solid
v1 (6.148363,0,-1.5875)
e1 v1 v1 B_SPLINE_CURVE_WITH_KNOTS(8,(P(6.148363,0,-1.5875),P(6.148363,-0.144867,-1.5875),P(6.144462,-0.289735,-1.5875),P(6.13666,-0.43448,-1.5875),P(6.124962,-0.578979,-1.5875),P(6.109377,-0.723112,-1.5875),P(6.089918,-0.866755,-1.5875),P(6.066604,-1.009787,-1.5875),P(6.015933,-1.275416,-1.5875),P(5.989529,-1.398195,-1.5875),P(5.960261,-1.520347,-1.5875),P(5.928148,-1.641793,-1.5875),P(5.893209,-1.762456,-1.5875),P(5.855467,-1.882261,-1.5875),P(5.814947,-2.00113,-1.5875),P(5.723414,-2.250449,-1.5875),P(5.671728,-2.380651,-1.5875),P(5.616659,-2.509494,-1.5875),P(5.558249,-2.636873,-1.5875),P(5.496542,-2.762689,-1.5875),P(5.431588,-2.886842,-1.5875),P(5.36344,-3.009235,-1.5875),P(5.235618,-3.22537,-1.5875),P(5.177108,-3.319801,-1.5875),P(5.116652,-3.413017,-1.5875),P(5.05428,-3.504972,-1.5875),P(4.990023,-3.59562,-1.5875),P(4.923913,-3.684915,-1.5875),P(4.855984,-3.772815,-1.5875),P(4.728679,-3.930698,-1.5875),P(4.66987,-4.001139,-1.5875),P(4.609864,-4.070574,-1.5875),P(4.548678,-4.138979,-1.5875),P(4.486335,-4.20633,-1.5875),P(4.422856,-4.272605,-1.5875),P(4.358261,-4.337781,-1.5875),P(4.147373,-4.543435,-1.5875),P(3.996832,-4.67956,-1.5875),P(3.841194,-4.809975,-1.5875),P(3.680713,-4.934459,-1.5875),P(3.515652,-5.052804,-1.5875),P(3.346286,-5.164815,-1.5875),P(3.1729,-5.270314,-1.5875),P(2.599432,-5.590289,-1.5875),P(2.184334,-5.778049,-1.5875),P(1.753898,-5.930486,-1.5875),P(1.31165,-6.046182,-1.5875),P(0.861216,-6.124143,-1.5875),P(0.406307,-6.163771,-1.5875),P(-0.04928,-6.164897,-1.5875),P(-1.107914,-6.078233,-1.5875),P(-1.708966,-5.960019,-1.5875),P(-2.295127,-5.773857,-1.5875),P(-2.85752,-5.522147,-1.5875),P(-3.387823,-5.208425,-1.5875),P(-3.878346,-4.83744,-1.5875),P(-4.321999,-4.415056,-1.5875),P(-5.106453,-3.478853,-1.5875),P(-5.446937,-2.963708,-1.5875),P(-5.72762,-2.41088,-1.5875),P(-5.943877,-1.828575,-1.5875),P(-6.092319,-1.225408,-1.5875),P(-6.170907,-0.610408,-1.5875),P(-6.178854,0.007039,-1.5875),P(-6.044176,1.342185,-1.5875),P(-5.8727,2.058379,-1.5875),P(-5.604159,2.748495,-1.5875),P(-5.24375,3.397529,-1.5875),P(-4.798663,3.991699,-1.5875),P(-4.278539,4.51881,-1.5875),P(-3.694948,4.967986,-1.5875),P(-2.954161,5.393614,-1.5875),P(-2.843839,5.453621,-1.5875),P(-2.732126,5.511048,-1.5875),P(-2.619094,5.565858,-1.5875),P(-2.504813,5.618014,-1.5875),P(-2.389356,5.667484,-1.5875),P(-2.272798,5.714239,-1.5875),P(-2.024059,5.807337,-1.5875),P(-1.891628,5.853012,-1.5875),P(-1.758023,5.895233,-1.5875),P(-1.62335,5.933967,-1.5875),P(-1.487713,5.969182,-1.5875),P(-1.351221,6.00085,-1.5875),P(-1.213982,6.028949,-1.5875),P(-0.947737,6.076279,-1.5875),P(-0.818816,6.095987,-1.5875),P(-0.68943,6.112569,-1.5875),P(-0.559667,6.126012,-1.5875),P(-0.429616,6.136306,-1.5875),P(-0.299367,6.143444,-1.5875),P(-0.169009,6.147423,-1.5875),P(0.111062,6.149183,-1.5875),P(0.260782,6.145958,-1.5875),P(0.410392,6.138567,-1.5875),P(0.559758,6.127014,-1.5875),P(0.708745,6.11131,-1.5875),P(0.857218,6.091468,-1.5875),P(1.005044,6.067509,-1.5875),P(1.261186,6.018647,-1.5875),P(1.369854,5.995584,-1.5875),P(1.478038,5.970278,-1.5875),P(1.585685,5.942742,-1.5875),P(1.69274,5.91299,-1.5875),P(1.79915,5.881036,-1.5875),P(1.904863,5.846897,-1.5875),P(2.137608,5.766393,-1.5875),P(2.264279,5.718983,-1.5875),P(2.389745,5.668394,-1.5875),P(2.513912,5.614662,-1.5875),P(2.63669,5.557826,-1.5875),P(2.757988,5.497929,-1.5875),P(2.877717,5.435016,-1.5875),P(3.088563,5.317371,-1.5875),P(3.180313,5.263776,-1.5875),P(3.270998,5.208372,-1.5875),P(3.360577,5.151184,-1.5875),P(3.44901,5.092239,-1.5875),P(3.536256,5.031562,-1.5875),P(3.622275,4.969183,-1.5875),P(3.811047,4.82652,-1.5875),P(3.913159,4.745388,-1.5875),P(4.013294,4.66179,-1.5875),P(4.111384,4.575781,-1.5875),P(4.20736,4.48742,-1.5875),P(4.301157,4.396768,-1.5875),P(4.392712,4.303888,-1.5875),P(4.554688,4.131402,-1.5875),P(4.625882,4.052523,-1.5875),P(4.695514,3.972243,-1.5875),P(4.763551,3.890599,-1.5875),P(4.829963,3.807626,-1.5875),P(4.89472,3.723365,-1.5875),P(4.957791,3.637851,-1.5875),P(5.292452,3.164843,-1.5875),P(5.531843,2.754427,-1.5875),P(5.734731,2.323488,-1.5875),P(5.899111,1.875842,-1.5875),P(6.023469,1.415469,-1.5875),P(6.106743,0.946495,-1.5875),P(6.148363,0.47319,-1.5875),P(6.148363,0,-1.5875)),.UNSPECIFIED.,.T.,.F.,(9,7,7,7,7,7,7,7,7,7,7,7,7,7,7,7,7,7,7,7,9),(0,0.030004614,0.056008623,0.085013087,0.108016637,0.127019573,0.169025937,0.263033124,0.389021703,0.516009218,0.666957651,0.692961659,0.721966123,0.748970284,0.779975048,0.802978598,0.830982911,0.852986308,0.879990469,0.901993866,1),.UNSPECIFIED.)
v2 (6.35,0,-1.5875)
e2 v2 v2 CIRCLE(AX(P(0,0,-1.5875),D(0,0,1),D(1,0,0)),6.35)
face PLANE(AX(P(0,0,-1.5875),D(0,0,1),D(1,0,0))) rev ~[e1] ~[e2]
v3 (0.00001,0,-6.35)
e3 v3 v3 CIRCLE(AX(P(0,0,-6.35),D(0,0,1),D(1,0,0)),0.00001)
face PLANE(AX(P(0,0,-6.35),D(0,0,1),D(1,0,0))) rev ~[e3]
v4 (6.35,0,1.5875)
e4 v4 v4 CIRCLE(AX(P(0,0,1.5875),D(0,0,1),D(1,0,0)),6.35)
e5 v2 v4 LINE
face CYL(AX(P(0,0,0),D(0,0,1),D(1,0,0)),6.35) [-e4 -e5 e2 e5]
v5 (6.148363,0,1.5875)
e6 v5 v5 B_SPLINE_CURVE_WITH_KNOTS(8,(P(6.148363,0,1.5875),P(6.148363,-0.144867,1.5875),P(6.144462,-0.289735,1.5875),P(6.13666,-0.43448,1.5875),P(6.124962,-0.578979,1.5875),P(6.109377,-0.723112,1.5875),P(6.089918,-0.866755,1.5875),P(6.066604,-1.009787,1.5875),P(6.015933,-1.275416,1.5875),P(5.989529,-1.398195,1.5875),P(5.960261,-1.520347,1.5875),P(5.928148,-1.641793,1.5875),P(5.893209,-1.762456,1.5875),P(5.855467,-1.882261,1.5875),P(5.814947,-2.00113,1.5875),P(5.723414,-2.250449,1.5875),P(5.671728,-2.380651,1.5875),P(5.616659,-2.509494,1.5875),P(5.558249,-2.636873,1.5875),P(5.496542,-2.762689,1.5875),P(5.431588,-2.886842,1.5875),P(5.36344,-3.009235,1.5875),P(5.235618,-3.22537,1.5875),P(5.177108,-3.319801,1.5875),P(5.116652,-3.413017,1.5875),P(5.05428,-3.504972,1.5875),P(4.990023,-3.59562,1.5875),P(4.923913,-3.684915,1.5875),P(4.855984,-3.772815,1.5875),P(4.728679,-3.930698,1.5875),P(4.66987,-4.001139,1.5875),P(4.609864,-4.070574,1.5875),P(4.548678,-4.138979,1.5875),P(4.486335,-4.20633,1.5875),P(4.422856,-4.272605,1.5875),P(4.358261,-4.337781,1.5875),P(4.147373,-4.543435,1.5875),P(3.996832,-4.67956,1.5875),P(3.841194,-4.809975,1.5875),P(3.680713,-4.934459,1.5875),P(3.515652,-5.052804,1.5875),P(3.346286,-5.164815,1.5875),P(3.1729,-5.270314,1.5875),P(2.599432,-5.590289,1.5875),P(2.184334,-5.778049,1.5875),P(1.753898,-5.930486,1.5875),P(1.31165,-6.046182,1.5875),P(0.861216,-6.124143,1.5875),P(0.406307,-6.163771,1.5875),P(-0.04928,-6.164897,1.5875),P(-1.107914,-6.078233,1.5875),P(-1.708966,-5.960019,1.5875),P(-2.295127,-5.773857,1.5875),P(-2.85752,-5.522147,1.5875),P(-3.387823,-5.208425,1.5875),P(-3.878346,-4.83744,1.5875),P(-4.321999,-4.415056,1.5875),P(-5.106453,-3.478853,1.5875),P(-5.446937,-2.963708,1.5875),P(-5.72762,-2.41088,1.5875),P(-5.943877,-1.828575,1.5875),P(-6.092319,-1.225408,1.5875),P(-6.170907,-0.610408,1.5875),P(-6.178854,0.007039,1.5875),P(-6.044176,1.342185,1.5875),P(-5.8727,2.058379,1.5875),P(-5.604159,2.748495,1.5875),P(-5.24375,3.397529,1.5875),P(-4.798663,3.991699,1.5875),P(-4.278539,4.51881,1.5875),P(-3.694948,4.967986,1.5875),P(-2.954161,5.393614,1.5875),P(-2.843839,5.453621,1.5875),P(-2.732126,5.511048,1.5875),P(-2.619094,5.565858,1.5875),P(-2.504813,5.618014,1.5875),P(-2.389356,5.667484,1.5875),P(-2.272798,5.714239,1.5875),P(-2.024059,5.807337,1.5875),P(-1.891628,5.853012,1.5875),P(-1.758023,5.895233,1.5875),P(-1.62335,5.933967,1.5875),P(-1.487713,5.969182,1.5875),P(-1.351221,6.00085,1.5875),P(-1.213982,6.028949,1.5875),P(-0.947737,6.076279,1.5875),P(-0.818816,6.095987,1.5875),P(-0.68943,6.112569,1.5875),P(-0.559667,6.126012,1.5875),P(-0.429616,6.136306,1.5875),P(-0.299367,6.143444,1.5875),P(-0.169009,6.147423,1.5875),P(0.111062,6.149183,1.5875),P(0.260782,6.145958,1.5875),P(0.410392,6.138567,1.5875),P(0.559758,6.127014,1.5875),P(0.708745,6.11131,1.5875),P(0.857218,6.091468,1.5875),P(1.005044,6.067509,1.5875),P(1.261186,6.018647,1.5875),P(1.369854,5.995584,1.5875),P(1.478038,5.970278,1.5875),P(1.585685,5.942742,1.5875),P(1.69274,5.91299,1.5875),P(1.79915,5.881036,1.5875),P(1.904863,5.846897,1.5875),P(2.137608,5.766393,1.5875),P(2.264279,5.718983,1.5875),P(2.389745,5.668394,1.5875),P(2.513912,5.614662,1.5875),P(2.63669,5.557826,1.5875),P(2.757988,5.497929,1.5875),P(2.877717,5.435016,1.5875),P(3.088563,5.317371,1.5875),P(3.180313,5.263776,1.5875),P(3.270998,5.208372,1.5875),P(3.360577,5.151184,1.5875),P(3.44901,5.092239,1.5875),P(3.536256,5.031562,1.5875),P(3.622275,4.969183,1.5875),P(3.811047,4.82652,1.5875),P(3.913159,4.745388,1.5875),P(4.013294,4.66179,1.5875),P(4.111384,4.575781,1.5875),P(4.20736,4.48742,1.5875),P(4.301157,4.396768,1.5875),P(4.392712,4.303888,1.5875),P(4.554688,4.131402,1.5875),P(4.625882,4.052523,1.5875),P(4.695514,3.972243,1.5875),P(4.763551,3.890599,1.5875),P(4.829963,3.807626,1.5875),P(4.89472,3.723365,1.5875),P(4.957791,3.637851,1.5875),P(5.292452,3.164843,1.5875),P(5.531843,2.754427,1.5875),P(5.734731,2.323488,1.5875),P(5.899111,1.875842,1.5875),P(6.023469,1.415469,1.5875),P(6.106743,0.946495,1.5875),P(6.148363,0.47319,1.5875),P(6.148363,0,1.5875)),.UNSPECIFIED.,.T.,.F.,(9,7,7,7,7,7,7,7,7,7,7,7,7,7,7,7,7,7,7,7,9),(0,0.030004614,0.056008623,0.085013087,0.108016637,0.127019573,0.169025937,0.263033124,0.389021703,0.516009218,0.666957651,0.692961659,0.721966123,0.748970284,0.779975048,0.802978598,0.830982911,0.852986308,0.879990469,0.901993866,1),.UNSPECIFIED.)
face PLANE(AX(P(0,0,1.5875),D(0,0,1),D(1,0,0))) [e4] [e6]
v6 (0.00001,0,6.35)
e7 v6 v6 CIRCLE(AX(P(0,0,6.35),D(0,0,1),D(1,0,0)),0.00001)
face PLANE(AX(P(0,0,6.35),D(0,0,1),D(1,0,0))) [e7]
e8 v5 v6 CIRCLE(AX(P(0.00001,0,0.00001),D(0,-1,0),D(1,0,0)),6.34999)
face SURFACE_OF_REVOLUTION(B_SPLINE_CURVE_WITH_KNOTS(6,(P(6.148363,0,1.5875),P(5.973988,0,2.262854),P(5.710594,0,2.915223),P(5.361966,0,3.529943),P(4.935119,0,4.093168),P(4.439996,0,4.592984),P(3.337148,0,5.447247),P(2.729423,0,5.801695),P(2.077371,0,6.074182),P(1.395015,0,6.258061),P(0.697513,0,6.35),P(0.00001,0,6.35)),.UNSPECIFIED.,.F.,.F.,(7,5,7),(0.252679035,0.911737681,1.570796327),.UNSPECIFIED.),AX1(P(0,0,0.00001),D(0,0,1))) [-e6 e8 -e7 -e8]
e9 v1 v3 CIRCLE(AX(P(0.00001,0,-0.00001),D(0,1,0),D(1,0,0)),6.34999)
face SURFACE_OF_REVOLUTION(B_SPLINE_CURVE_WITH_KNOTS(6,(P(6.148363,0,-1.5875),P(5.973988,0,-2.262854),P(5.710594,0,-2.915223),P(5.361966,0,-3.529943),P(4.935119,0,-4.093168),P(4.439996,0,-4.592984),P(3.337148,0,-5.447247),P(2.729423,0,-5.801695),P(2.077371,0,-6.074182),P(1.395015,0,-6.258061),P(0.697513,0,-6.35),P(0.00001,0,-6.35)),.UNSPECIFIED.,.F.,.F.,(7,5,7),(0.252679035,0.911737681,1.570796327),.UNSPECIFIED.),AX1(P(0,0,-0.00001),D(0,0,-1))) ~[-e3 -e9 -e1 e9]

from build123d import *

# Parameters (mm, degrees)
F0_R     = 6.35
F1_DEPTH = 6.35
F2_R     = 6.34999
F3_R     = 6.35
F4_DEPTH = 1.5875


# Not quite as in the source:
# - a fillet or chamfer is up to 0.001 mm smaller than in the source, because OpenCascade refuses the exact size


with BuildPart() as f1:
    # F0 (on Top) → F1 (new body, symmetric)
    with BuildSketch(Plane.XY):
        Circle(F0_R)
    extrude(amount=F1_DEPTH, both=True)

    # F2 (radius 6.35 in the source; OpenCascade refuses exactly that, so slightly less here)
    f2_edges = [f1.edges().sort_by_distance(p)[0] for p in [
        (-6.35, 0, 6.35),
        (-6.35, 0, -6.35),
    ]]
    fillet(f2_edges, radius=F2_R)

    # F3 (on Top) → F4 (join, symmetric)
    with BuildSketch(Plane.XY):
        Circle(F3_R)
    extrude(amount=F4_DEPTH, both=True)


solid = f1.part
